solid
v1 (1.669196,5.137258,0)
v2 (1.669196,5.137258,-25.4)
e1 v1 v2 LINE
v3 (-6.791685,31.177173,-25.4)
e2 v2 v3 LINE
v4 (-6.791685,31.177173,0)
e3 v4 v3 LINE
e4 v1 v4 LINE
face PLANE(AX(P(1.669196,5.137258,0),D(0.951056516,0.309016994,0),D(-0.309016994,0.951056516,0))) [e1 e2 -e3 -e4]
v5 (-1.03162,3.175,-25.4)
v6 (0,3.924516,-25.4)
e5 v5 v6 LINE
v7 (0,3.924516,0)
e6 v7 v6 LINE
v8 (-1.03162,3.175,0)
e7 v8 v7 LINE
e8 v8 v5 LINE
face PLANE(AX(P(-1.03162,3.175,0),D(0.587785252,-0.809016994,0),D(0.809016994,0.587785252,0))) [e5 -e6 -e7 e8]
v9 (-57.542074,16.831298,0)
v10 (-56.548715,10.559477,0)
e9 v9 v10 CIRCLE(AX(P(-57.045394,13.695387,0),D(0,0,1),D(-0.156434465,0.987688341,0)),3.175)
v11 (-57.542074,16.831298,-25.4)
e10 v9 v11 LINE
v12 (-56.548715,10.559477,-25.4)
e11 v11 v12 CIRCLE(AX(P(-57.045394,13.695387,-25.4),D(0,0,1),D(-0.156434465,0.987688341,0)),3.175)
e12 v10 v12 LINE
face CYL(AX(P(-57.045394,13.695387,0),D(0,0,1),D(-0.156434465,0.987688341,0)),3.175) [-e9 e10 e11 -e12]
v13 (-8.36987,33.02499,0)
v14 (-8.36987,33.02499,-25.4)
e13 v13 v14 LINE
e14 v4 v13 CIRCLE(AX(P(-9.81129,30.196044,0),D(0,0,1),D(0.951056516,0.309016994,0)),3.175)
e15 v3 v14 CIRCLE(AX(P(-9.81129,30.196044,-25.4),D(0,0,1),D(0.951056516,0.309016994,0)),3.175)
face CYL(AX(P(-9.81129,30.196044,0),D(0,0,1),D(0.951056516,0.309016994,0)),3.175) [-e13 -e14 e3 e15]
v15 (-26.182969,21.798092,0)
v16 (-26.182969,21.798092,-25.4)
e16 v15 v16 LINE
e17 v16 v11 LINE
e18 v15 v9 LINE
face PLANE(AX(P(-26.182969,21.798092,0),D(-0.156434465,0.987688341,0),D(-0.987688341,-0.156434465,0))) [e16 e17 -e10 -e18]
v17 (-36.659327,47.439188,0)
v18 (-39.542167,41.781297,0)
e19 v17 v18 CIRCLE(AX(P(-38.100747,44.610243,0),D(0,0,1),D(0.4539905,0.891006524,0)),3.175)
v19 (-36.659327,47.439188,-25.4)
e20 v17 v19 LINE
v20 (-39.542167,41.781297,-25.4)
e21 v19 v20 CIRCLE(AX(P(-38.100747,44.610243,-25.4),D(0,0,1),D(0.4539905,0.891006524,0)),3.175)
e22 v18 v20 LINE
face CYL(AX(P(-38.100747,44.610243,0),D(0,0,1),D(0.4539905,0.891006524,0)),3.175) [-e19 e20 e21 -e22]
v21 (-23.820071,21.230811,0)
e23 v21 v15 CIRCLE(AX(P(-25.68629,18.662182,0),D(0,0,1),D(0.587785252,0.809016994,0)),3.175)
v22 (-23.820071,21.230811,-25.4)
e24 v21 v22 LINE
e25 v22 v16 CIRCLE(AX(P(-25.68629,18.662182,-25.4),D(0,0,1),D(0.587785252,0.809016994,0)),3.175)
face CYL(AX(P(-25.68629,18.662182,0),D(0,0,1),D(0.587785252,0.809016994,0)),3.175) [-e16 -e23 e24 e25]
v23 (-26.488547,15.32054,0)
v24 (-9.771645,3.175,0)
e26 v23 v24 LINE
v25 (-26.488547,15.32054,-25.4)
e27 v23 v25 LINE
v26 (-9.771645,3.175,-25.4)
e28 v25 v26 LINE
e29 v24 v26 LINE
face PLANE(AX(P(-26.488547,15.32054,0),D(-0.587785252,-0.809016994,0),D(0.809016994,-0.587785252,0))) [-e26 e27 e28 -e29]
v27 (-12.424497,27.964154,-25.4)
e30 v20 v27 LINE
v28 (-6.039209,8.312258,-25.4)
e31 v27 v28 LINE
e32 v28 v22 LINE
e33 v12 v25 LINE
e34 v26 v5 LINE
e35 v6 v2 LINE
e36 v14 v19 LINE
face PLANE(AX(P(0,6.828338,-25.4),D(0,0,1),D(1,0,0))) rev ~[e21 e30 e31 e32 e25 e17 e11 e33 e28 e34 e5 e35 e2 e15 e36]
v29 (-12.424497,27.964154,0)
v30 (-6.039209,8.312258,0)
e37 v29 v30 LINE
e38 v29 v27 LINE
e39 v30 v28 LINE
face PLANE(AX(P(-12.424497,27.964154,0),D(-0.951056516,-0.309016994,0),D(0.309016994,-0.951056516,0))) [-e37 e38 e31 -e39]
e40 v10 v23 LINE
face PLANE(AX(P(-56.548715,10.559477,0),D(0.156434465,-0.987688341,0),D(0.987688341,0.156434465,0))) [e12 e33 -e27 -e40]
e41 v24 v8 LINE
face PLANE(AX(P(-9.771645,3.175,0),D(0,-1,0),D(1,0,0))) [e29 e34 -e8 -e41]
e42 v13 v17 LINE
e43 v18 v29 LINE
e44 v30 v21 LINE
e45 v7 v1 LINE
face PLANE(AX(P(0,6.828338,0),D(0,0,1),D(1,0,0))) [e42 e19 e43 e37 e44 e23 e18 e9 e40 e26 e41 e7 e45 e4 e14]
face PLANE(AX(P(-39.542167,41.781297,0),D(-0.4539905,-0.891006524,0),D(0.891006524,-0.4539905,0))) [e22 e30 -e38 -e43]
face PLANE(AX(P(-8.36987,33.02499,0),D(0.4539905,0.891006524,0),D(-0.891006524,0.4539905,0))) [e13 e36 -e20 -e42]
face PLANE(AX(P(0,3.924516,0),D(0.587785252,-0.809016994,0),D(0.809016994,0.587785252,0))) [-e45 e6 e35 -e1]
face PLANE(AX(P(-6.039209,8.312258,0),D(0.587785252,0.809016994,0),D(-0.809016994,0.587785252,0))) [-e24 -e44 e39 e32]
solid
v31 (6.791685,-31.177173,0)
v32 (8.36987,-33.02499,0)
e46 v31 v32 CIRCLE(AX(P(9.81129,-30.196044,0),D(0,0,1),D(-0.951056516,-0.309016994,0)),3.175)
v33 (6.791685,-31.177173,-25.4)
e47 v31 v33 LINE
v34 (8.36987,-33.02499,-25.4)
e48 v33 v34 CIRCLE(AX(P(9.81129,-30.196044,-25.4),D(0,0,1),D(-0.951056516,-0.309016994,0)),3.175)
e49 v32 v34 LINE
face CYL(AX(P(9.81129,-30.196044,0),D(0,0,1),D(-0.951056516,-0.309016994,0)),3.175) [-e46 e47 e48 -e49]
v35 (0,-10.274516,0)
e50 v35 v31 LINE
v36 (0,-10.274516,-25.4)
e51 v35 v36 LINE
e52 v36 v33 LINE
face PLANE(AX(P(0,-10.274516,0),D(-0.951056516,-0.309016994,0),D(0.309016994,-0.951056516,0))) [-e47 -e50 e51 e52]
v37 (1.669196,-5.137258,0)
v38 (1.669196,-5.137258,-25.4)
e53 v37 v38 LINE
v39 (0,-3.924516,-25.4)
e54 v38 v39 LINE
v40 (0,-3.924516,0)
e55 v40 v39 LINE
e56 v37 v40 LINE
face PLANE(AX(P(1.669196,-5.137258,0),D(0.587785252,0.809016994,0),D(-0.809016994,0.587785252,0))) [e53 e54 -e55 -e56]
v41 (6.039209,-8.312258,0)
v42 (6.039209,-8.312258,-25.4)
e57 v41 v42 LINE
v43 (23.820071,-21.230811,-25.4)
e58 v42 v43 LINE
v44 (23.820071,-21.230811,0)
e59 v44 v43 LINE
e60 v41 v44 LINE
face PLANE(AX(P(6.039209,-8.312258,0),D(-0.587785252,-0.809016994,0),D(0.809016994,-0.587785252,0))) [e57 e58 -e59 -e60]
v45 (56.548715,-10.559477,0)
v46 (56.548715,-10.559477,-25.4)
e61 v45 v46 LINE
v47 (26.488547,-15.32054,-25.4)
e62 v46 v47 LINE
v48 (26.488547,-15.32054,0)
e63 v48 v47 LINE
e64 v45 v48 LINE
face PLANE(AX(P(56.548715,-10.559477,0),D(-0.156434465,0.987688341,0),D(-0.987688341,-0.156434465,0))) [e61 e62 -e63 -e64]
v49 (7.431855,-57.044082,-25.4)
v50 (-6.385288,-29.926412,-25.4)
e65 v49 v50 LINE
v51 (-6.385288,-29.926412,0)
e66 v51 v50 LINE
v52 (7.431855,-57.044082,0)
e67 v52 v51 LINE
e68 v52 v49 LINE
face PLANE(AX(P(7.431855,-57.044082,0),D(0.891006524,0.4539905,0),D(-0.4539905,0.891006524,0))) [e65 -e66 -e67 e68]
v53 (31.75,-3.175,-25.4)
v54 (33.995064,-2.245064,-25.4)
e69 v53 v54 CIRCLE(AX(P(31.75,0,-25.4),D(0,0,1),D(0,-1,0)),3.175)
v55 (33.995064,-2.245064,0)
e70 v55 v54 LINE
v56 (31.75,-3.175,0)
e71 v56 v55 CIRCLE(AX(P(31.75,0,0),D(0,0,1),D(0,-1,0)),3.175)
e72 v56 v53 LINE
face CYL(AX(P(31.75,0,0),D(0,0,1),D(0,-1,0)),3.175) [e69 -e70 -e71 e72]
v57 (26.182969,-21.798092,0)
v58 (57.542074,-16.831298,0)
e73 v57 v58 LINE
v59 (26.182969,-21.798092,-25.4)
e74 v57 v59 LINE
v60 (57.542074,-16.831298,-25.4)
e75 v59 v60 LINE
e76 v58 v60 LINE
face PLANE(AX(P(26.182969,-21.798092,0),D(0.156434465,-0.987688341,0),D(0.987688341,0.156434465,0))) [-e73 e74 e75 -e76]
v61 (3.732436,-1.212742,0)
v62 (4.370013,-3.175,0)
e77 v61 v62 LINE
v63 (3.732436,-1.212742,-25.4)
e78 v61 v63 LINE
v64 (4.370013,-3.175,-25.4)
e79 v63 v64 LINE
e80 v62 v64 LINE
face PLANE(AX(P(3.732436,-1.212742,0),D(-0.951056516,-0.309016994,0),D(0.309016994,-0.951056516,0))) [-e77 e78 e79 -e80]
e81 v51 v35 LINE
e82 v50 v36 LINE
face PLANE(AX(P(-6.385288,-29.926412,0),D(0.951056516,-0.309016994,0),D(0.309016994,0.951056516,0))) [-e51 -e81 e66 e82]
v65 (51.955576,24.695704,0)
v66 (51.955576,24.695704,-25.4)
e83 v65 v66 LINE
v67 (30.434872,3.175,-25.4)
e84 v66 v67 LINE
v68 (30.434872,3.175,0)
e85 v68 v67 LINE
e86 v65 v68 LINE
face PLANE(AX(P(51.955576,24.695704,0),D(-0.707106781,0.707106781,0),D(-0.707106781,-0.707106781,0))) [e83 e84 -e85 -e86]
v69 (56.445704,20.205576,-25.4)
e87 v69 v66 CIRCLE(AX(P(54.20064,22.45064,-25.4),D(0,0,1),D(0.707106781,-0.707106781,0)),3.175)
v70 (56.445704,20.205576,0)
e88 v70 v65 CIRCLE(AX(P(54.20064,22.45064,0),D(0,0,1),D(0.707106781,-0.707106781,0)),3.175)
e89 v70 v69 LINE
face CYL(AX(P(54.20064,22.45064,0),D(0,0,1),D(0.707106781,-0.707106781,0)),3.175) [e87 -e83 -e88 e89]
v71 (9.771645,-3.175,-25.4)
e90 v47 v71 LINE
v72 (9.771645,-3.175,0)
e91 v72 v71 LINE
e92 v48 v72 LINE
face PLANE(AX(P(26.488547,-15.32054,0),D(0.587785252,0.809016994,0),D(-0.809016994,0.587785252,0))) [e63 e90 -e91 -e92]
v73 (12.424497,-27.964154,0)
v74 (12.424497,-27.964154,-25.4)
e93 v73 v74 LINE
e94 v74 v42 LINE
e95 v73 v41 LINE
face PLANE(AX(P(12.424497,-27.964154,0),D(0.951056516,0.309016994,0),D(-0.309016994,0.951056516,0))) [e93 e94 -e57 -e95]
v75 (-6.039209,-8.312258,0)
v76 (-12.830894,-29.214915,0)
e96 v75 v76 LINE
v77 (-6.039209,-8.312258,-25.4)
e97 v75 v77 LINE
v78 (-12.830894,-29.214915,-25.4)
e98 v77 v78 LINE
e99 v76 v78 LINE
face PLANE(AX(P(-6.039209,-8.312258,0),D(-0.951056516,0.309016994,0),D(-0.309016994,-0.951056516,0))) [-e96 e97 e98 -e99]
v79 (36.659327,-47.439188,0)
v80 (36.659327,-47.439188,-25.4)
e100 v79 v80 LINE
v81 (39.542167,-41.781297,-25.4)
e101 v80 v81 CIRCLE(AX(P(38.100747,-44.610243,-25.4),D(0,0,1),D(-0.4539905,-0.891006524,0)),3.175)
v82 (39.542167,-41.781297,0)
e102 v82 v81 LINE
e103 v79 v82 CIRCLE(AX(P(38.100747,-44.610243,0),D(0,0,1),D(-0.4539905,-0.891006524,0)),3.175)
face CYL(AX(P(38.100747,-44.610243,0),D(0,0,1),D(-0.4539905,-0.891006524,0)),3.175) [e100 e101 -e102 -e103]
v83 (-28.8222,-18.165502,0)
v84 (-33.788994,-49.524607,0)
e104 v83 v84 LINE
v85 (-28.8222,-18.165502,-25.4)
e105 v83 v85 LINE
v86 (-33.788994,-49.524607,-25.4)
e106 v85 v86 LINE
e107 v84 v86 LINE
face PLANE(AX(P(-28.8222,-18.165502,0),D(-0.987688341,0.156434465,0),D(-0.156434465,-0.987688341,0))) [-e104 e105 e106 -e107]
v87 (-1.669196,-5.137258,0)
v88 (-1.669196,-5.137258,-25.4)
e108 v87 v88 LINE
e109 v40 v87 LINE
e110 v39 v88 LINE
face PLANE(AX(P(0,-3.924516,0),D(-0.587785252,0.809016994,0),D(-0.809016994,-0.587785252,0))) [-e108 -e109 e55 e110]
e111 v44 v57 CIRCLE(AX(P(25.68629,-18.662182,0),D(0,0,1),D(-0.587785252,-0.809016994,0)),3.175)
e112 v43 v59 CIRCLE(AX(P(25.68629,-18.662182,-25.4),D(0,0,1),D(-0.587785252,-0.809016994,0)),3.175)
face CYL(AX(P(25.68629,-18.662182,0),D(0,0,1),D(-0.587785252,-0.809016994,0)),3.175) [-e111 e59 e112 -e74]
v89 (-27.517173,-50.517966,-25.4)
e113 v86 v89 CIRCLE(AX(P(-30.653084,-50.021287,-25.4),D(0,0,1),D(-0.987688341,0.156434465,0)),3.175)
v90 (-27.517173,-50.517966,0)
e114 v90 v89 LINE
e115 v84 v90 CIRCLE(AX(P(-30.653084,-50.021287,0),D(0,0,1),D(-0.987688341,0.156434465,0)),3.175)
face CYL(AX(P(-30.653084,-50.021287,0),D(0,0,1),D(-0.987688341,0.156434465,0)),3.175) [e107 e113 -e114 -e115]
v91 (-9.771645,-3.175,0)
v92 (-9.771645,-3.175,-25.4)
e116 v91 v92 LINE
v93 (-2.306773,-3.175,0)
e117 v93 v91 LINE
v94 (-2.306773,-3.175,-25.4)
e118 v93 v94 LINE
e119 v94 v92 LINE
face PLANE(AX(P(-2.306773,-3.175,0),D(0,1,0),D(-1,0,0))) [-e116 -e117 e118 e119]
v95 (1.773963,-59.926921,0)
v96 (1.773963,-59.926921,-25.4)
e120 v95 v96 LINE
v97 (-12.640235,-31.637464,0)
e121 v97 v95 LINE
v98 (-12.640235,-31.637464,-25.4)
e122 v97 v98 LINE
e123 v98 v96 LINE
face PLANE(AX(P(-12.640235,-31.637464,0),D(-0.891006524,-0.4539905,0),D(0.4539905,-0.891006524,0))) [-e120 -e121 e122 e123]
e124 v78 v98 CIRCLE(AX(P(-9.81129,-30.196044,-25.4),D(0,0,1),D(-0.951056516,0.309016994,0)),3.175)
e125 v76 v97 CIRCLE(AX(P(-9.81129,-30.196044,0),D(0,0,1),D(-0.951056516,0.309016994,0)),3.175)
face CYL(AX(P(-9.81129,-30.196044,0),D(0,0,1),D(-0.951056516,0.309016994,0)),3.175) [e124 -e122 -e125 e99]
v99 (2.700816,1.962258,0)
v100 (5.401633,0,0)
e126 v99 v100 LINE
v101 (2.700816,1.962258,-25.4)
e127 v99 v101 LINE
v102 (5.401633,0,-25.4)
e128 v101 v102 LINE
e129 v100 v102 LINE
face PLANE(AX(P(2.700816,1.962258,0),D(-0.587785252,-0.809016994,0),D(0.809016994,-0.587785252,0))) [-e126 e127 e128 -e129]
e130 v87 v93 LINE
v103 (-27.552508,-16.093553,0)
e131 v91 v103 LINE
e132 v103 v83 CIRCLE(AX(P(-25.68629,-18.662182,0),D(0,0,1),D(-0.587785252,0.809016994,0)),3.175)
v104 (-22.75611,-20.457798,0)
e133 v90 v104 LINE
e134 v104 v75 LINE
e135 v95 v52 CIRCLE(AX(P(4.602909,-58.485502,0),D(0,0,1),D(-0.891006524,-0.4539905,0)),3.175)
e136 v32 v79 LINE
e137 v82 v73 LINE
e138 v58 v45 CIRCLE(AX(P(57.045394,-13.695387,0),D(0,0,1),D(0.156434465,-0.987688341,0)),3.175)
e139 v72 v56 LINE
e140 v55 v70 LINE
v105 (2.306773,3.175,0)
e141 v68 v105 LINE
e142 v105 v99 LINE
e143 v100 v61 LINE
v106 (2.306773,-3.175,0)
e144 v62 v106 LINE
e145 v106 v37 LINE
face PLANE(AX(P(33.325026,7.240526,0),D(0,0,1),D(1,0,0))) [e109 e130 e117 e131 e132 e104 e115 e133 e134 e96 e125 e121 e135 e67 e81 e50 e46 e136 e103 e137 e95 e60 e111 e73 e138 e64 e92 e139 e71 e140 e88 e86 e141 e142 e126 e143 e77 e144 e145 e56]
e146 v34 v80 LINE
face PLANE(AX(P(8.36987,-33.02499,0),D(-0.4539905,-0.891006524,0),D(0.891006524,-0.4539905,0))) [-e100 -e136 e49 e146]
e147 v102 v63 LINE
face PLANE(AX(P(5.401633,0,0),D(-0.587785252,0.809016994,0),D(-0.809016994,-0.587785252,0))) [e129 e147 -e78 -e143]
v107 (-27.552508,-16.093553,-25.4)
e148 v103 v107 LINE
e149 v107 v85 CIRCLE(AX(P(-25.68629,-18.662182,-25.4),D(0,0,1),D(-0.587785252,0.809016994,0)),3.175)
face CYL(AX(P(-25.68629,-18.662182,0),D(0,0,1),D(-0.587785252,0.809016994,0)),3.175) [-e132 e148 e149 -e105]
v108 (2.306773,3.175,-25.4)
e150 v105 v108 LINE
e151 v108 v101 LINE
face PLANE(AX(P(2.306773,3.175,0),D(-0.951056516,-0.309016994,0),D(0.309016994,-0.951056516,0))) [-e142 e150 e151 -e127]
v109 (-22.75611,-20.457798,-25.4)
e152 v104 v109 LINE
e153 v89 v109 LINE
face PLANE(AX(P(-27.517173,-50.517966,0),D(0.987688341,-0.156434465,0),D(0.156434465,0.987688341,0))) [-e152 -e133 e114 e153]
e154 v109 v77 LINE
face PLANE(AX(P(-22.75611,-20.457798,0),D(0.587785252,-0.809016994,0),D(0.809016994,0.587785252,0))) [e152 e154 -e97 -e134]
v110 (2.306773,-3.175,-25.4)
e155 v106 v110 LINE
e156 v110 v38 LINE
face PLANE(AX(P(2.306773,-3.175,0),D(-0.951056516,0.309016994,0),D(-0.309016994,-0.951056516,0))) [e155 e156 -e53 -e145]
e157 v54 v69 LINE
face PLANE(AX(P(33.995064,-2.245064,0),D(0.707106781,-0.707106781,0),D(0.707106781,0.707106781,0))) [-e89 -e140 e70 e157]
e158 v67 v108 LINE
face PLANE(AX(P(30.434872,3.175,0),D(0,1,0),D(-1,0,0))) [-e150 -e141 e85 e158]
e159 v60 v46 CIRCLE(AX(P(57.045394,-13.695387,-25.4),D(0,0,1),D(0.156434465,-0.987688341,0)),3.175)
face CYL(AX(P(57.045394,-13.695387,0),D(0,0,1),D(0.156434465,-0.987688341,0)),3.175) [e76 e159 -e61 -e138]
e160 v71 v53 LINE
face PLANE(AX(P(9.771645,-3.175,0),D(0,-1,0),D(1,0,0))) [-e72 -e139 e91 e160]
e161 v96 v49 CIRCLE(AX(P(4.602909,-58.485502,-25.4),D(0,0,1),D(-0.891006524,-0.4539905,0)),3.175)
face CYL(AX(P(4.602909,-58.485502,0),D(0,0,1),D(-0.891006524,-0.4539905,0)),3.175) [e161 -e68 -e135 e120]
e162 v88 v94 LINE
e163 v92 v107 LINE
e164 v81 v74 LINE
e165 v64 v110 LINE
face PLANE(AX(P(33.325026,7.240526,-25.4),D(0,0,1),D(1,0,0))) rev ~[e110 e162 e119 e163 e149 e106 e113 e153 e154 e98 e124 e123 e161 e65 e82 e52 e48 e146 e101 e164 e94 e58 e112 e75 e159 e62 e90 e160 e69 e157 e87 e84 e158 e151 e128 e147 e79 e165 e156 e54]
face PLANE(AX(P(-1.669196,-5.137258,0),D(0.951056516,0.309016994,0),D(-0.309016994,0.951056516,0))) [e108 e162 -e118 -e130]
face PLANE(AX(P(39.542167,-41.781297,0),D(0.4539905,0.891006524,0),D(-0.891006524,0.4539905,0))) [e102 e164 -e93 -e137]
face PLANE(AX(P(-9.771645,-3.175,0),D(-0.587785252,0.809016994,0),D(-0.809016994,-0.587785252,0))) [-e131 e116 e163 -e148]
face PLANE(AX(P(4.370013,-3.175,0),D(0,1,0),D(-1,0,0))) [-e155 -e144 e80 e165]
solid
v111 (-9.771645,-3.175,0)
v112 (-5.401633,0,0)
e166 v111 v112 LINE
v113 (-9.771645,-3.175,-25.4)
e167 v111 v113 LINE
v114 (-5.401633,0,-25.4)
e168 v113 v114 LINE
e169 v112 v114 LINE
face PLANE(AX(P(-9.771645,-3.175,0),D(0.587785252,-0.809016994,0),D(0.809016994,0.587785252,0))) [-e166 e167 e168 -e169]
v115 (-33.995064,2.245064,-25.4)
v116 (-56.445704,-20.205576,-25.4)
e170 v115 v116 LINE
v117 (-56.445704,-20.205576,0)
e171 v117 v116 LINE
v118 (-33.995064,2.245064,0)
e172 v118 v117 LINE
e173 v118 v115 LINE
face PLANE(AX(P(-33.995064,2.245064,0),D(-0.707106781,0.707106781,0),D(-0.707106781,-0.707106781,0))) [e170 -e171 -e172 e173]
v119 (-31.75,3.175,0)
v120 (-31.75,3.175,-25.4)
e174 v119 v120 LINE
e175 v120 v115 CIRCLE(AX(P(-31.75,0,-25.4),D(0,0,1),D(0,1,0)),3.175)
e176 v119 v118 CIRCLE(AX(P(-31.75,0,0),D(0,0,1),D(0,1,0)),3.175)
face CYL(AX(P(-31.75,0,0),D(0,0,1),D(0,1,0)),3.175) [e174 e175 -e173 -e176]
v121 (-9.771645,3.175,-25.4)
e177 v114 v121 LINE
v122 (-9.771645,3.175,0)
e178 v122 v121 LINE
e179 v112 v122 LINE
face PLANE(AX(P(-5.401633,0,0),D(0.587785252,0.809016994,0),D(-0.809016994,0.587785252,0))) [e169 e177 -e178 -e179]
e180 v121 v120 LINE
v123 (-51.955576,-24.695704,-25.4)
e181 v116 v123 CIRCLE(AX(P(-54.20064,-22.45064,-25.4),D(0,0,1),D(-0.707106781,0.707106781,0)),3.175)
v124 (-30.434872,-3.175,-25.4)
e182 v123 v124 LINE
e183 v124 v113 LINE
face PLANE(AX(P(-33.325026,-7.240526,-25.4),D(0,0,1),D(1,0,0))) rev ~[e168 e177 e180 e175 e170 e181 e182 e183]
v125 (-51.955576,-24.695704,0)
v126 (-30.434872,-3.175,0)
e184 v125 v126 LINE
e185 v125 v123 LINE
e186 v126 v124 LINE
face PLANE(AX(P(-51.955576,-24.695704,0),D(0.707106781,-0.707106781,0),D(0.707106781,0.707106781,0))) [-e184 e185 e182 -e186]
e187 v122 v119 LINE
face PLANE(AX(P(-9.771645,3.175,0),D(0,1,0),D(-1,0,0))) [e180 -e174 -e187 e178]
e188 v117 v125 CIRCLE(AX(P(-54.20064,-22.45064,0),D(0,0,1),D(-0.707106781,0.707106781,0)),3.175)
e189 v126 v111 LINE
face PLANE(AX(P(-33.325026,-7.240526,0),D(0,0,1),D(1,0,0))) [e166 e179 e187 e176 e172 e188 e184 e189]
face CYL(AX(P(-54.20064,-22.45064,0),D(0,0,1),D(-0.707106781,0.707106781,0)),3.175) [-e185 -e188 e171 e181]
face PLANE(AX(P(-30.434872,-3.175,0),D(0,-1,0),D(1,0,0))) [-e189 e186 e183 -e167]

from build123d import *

# Parameters (mm, degrees)
F1_DEPTH = 25.4


# Not quite as in the source:
# - a feature names something its author has since deleted; it is built from what else it names


with BuildPart() as f1:
    # F0 (on Top) → F1 (new body)
    with BuildSketch(Plane.XY):
        with BuildLine():
            Line((9.7716452305, -3.175), (31.75, -3.175))
            ThreePointArc((31.75, -3.175), (32.9650198978, -2.9333175157), (33.9950640303, -2.2450640303))
            Line((33.9950640303, -2.2450640303), (56.4457043329, 20.2055762724))
            ThreePointArc((56.4457043329, 20.2055762724), (56.4457043329, 24.6957043329), (51.9555762724, 24.6957043329))
            Line((51.9555762724, 24.6957043329), (30.4348719395, 3.175))
            Line((30.4348719395, 3.175), (9.7716452305, 3.175))
            Line((9.7716452305, 3.175), (5.401632633, 0))
            Line((5.401632633, 0), (9.7716452305, -3.175))
        make_face()
        with BuildLine():
            Line((26.4885467967, -15.3205399243), (9.7716452305, -3.175))
            Line((9.7716452305, -3.175), (4.3700125975, -3.175))
            Line((4.3700125975, -3.175), (6.0392088785, -8.3122579143))
            Line((6.0392088785, -8.3122579143), (23.8200713954, -21.2308107174))
            ThreePointArc((23.8200713954, -21.2308107174), (24.9451005412, -21.7494562575), (26.1829689979, -21.7980922417))
            Line((26.1829689979, -21.7980922417), (57.5420738118, -16.8312979766))
            ThreePointArc((57.5420738118, -16.8312979766), (60.1813048667, -13.1987080688), (56.5487149588, -10.5594770139))
            Line((56.5487149588, -10.5594770139), (26.4885467967, -15.3205399243))
        make_face()
        Polygon((4.3700125975, -3.175), (9.7716452305, -3.175), (5.401632633, 0), (3.7324363521, -1.2127420857), align=None)
        Polygon((6.0392088785, -8.3122579143), (4.3700125975, -3.175), (2.3067725264, -3.175), (1.669196281, -5.1372579143), align=None)
        Polygon((2.7008163165, 1.9622579143), (5.401632633, 0), (9.7716452305, 3.175), (2.3067725264, 3.175), align=None)
        with BuildLine():
            Line((12.4244970902, -27.9641543235), (6.0392088785, -8.3122579143))
            Line((6.0392088785, -8.3122579143), (1.669196281, -5.1372579143))
            Line((1.669196281, -5.1372579143), (0, -10.2745158286))
            Line((0, -10.2745158286), (6.7916851322, -31.1771733495))
            ThreePointArc((6.7916851322, -31.1771733495), (7.3970006306, -32.2580419458), (8.3698697347, -33.0249901067))
            Line((8.3698697347, -33.0249901067), (36.6593268777, -47.4391884734))
            ThreePointArc((36.6593268777, -47.4391884734), (40.9296924287, -46.0516625958), (39.5421665511, -41.7812970448))
            Line((39.5421665511, -41.7812970448), (12.4244970902, -27.9641543235))
        make_face()
        Polygon((0, -10.2745158286), (1.669196281, -5.1372579143), (0, -3.9245158286), (-1.669196281, -5.1372579143), align=None)
        with BuildLine():
            Line((-6.3852882117, -29.9264122378), (0, -10.2745158286))
            Line((0, -10.2745158286), (-1.669196281, -5.1372579143))
            Line((-1.669196281, -5.1372579143), (-6.0392088785, -8.3122579143))
            Line((-6.0392088785, -8.3122579143), (-12.8308940106, -29.2149154352))
            ThreePointArc((-12.8308940106, -29.2149154352), (-12.976502106, -30.4451520213), (-12.6402352857, -31.637464229))
            Line((-12.6402352857, -31.637464229), (1.773963081, -59.926921372))
            ThreePointArc((1.773963081, -59.926921372), (6.044328632, -61.3144472496), (7.4318545096, -57.0440816987))
            Line((7.4318545096, -57.0440816987), (-6.3852882117, -29.9264122378))
        make_face()
        with BuildLine():
            Line((-6.0392088785, -8.3122579143), (-1.669196281, -5.1372579143))
            Line((-1.669196281, -5.1372579143), (-2.3067725264, -3.175))
            Line((-2.3067725264, -3.175), (-9.7716452305, -3.175))
            Line((-9.7716452305, -3.175), (-27.5525077474, -16.0935528031))
            ThreePointArc((-27.5525077474, -16.0935528031), (-28.3934220932, -17.0032488173), (-28.8222000528, -18.1655023338))
            Line((-28.8222000528, -18.1655023338), (-33.7889943178, -49.5246071477))
            ThreePointArc((-33.7889943178, -49.5246071477), (-31.1497632629, -53.1571970556), (-27.517173355, -50.5179660007))
            Line((-27.517173355, -50.5179660007), (-22.7561104446, -20.4577978386))
            Line((-22.7561104446, -20.4577978386), (-6.0392088785, -8.3122579143))
        make_face()
    extrude(amount=-F1_DEPTH)


with BuildPart() as f1b:
    # F0 (on Top) → F1, piece 2 (new body)
    with BuildSketch(Plane.XY):
        Polygon((0, 3.9245158286), (1.669196281, 5.1372579143), (0, 10.2745158286), (-1.669196281, 5.1372579143), align=None)
        Polygon((-1.0316200355, 3.175), (0, 3.9245158286), (-1.669196281, 5.1372579143), (-2.3067725264, 3.175), align=None)
        with BuildLine():
            Line((-1.669196281, 5.1372579143), (0, 10.2745158286))
            Line((0, 10.2745158286), (-6.7916851322, 31.1771733495))
            ThreePointArc((-6.7916851322, 31.1771733495), (-7.3970006306, 32.2580419458), (-8.3698697347, 33.0249901067))
            Line((-8.3698697347, 33.0249901067), (-36.6593268777, 47.4391884734))
            ThreePointArc((-36.6593268777, 47.4391884734), (-40.9296924287, 46.0516625958), (-39.5421665511, 41.7812970448))
            Line((-39.5421665511, 41.7812970448), (-12.4244970902, 27.9641543235))
            Line((-12.4244970902, 27.9641543235), (-6.0392088785, 8.3122579143))
            Line((-6.0392088785, 8.3122579143), (-1.669196281, 5.1372579143))
        make_face()
        Polygon((-2.3067725264, 3.175), (-1.669196281, 5.1372579143), (-6.0392088785, 8.3122579143), (-4.3700125975, 3.175), align=None)
        with BuildLine():
            Line((-4.3700125975, 3.175), (-6.0392088785, 8.3122579143))
            Line((-6.0392088785, 8.3122579143), (-23.8200713954, 21.2308107174))
            ThreePointArc((-23.8200713954, 21.2308107174), (-24.9451005412, 21.7494562575), (-26.1829689979, 21.7980922417))
            Line((-26.1829689979, 21.7980922417), (-57.5420738118, 16.8312979766))
            ThreePointArc((-57.5420738118, 16.8312979766), (-60.1813048667, 13.1987080688), (-56.5487149588, 10.5594770139))
            Line((-56.5487149588, 10.5594770139), (-26.4885467967, 15.3205399243))
            Line((-26.4885467967, 15.3205399243), (-9.7716452305, 3.175))
            Line((-9.7716452305, 3.175), (-4.3700125975, 3.175))
        make_face()
    extrude(amount=-F1_DEPTH)


with BuildPart() as f1c:
    # F0 (on Top) → F1, piece 3 (new body)
    with BuildSketch(Plane.XY):
        with BuildLine():
            Line((-30.4348719395, -3.175), (-9.7716452305, -3.175))
            Line((-9.7716452305, -3.175), (-5.401632633, 0))
            Line((-5.401632633, 0), (-9.7716452305, 3.175))
            Line((-9.7716452305, 3.175), (-31.75, 3.175))
            ThreePointArc((-31.75, 3.175), (-32.9650198978, 2.9333175157), (-33.9950640303, 2.2450640303))
            Line((-33.9950640303, 2.2450640303), (-56.4457043329, -20.2055762724))
            ThreePointArc((-56.4457043329, -20.2055762724), (-56.4457043329, -24.6957043329), (-51.9555762724, -24.6957043329))
            Line((-51.9555762724, -24.6957043329), (-30.4348719395, -3.175))
        make_face()
    extrude(amount=-F1_DEPTH)


solid = Compound([f1.part, f1b.part, f1c.part])
